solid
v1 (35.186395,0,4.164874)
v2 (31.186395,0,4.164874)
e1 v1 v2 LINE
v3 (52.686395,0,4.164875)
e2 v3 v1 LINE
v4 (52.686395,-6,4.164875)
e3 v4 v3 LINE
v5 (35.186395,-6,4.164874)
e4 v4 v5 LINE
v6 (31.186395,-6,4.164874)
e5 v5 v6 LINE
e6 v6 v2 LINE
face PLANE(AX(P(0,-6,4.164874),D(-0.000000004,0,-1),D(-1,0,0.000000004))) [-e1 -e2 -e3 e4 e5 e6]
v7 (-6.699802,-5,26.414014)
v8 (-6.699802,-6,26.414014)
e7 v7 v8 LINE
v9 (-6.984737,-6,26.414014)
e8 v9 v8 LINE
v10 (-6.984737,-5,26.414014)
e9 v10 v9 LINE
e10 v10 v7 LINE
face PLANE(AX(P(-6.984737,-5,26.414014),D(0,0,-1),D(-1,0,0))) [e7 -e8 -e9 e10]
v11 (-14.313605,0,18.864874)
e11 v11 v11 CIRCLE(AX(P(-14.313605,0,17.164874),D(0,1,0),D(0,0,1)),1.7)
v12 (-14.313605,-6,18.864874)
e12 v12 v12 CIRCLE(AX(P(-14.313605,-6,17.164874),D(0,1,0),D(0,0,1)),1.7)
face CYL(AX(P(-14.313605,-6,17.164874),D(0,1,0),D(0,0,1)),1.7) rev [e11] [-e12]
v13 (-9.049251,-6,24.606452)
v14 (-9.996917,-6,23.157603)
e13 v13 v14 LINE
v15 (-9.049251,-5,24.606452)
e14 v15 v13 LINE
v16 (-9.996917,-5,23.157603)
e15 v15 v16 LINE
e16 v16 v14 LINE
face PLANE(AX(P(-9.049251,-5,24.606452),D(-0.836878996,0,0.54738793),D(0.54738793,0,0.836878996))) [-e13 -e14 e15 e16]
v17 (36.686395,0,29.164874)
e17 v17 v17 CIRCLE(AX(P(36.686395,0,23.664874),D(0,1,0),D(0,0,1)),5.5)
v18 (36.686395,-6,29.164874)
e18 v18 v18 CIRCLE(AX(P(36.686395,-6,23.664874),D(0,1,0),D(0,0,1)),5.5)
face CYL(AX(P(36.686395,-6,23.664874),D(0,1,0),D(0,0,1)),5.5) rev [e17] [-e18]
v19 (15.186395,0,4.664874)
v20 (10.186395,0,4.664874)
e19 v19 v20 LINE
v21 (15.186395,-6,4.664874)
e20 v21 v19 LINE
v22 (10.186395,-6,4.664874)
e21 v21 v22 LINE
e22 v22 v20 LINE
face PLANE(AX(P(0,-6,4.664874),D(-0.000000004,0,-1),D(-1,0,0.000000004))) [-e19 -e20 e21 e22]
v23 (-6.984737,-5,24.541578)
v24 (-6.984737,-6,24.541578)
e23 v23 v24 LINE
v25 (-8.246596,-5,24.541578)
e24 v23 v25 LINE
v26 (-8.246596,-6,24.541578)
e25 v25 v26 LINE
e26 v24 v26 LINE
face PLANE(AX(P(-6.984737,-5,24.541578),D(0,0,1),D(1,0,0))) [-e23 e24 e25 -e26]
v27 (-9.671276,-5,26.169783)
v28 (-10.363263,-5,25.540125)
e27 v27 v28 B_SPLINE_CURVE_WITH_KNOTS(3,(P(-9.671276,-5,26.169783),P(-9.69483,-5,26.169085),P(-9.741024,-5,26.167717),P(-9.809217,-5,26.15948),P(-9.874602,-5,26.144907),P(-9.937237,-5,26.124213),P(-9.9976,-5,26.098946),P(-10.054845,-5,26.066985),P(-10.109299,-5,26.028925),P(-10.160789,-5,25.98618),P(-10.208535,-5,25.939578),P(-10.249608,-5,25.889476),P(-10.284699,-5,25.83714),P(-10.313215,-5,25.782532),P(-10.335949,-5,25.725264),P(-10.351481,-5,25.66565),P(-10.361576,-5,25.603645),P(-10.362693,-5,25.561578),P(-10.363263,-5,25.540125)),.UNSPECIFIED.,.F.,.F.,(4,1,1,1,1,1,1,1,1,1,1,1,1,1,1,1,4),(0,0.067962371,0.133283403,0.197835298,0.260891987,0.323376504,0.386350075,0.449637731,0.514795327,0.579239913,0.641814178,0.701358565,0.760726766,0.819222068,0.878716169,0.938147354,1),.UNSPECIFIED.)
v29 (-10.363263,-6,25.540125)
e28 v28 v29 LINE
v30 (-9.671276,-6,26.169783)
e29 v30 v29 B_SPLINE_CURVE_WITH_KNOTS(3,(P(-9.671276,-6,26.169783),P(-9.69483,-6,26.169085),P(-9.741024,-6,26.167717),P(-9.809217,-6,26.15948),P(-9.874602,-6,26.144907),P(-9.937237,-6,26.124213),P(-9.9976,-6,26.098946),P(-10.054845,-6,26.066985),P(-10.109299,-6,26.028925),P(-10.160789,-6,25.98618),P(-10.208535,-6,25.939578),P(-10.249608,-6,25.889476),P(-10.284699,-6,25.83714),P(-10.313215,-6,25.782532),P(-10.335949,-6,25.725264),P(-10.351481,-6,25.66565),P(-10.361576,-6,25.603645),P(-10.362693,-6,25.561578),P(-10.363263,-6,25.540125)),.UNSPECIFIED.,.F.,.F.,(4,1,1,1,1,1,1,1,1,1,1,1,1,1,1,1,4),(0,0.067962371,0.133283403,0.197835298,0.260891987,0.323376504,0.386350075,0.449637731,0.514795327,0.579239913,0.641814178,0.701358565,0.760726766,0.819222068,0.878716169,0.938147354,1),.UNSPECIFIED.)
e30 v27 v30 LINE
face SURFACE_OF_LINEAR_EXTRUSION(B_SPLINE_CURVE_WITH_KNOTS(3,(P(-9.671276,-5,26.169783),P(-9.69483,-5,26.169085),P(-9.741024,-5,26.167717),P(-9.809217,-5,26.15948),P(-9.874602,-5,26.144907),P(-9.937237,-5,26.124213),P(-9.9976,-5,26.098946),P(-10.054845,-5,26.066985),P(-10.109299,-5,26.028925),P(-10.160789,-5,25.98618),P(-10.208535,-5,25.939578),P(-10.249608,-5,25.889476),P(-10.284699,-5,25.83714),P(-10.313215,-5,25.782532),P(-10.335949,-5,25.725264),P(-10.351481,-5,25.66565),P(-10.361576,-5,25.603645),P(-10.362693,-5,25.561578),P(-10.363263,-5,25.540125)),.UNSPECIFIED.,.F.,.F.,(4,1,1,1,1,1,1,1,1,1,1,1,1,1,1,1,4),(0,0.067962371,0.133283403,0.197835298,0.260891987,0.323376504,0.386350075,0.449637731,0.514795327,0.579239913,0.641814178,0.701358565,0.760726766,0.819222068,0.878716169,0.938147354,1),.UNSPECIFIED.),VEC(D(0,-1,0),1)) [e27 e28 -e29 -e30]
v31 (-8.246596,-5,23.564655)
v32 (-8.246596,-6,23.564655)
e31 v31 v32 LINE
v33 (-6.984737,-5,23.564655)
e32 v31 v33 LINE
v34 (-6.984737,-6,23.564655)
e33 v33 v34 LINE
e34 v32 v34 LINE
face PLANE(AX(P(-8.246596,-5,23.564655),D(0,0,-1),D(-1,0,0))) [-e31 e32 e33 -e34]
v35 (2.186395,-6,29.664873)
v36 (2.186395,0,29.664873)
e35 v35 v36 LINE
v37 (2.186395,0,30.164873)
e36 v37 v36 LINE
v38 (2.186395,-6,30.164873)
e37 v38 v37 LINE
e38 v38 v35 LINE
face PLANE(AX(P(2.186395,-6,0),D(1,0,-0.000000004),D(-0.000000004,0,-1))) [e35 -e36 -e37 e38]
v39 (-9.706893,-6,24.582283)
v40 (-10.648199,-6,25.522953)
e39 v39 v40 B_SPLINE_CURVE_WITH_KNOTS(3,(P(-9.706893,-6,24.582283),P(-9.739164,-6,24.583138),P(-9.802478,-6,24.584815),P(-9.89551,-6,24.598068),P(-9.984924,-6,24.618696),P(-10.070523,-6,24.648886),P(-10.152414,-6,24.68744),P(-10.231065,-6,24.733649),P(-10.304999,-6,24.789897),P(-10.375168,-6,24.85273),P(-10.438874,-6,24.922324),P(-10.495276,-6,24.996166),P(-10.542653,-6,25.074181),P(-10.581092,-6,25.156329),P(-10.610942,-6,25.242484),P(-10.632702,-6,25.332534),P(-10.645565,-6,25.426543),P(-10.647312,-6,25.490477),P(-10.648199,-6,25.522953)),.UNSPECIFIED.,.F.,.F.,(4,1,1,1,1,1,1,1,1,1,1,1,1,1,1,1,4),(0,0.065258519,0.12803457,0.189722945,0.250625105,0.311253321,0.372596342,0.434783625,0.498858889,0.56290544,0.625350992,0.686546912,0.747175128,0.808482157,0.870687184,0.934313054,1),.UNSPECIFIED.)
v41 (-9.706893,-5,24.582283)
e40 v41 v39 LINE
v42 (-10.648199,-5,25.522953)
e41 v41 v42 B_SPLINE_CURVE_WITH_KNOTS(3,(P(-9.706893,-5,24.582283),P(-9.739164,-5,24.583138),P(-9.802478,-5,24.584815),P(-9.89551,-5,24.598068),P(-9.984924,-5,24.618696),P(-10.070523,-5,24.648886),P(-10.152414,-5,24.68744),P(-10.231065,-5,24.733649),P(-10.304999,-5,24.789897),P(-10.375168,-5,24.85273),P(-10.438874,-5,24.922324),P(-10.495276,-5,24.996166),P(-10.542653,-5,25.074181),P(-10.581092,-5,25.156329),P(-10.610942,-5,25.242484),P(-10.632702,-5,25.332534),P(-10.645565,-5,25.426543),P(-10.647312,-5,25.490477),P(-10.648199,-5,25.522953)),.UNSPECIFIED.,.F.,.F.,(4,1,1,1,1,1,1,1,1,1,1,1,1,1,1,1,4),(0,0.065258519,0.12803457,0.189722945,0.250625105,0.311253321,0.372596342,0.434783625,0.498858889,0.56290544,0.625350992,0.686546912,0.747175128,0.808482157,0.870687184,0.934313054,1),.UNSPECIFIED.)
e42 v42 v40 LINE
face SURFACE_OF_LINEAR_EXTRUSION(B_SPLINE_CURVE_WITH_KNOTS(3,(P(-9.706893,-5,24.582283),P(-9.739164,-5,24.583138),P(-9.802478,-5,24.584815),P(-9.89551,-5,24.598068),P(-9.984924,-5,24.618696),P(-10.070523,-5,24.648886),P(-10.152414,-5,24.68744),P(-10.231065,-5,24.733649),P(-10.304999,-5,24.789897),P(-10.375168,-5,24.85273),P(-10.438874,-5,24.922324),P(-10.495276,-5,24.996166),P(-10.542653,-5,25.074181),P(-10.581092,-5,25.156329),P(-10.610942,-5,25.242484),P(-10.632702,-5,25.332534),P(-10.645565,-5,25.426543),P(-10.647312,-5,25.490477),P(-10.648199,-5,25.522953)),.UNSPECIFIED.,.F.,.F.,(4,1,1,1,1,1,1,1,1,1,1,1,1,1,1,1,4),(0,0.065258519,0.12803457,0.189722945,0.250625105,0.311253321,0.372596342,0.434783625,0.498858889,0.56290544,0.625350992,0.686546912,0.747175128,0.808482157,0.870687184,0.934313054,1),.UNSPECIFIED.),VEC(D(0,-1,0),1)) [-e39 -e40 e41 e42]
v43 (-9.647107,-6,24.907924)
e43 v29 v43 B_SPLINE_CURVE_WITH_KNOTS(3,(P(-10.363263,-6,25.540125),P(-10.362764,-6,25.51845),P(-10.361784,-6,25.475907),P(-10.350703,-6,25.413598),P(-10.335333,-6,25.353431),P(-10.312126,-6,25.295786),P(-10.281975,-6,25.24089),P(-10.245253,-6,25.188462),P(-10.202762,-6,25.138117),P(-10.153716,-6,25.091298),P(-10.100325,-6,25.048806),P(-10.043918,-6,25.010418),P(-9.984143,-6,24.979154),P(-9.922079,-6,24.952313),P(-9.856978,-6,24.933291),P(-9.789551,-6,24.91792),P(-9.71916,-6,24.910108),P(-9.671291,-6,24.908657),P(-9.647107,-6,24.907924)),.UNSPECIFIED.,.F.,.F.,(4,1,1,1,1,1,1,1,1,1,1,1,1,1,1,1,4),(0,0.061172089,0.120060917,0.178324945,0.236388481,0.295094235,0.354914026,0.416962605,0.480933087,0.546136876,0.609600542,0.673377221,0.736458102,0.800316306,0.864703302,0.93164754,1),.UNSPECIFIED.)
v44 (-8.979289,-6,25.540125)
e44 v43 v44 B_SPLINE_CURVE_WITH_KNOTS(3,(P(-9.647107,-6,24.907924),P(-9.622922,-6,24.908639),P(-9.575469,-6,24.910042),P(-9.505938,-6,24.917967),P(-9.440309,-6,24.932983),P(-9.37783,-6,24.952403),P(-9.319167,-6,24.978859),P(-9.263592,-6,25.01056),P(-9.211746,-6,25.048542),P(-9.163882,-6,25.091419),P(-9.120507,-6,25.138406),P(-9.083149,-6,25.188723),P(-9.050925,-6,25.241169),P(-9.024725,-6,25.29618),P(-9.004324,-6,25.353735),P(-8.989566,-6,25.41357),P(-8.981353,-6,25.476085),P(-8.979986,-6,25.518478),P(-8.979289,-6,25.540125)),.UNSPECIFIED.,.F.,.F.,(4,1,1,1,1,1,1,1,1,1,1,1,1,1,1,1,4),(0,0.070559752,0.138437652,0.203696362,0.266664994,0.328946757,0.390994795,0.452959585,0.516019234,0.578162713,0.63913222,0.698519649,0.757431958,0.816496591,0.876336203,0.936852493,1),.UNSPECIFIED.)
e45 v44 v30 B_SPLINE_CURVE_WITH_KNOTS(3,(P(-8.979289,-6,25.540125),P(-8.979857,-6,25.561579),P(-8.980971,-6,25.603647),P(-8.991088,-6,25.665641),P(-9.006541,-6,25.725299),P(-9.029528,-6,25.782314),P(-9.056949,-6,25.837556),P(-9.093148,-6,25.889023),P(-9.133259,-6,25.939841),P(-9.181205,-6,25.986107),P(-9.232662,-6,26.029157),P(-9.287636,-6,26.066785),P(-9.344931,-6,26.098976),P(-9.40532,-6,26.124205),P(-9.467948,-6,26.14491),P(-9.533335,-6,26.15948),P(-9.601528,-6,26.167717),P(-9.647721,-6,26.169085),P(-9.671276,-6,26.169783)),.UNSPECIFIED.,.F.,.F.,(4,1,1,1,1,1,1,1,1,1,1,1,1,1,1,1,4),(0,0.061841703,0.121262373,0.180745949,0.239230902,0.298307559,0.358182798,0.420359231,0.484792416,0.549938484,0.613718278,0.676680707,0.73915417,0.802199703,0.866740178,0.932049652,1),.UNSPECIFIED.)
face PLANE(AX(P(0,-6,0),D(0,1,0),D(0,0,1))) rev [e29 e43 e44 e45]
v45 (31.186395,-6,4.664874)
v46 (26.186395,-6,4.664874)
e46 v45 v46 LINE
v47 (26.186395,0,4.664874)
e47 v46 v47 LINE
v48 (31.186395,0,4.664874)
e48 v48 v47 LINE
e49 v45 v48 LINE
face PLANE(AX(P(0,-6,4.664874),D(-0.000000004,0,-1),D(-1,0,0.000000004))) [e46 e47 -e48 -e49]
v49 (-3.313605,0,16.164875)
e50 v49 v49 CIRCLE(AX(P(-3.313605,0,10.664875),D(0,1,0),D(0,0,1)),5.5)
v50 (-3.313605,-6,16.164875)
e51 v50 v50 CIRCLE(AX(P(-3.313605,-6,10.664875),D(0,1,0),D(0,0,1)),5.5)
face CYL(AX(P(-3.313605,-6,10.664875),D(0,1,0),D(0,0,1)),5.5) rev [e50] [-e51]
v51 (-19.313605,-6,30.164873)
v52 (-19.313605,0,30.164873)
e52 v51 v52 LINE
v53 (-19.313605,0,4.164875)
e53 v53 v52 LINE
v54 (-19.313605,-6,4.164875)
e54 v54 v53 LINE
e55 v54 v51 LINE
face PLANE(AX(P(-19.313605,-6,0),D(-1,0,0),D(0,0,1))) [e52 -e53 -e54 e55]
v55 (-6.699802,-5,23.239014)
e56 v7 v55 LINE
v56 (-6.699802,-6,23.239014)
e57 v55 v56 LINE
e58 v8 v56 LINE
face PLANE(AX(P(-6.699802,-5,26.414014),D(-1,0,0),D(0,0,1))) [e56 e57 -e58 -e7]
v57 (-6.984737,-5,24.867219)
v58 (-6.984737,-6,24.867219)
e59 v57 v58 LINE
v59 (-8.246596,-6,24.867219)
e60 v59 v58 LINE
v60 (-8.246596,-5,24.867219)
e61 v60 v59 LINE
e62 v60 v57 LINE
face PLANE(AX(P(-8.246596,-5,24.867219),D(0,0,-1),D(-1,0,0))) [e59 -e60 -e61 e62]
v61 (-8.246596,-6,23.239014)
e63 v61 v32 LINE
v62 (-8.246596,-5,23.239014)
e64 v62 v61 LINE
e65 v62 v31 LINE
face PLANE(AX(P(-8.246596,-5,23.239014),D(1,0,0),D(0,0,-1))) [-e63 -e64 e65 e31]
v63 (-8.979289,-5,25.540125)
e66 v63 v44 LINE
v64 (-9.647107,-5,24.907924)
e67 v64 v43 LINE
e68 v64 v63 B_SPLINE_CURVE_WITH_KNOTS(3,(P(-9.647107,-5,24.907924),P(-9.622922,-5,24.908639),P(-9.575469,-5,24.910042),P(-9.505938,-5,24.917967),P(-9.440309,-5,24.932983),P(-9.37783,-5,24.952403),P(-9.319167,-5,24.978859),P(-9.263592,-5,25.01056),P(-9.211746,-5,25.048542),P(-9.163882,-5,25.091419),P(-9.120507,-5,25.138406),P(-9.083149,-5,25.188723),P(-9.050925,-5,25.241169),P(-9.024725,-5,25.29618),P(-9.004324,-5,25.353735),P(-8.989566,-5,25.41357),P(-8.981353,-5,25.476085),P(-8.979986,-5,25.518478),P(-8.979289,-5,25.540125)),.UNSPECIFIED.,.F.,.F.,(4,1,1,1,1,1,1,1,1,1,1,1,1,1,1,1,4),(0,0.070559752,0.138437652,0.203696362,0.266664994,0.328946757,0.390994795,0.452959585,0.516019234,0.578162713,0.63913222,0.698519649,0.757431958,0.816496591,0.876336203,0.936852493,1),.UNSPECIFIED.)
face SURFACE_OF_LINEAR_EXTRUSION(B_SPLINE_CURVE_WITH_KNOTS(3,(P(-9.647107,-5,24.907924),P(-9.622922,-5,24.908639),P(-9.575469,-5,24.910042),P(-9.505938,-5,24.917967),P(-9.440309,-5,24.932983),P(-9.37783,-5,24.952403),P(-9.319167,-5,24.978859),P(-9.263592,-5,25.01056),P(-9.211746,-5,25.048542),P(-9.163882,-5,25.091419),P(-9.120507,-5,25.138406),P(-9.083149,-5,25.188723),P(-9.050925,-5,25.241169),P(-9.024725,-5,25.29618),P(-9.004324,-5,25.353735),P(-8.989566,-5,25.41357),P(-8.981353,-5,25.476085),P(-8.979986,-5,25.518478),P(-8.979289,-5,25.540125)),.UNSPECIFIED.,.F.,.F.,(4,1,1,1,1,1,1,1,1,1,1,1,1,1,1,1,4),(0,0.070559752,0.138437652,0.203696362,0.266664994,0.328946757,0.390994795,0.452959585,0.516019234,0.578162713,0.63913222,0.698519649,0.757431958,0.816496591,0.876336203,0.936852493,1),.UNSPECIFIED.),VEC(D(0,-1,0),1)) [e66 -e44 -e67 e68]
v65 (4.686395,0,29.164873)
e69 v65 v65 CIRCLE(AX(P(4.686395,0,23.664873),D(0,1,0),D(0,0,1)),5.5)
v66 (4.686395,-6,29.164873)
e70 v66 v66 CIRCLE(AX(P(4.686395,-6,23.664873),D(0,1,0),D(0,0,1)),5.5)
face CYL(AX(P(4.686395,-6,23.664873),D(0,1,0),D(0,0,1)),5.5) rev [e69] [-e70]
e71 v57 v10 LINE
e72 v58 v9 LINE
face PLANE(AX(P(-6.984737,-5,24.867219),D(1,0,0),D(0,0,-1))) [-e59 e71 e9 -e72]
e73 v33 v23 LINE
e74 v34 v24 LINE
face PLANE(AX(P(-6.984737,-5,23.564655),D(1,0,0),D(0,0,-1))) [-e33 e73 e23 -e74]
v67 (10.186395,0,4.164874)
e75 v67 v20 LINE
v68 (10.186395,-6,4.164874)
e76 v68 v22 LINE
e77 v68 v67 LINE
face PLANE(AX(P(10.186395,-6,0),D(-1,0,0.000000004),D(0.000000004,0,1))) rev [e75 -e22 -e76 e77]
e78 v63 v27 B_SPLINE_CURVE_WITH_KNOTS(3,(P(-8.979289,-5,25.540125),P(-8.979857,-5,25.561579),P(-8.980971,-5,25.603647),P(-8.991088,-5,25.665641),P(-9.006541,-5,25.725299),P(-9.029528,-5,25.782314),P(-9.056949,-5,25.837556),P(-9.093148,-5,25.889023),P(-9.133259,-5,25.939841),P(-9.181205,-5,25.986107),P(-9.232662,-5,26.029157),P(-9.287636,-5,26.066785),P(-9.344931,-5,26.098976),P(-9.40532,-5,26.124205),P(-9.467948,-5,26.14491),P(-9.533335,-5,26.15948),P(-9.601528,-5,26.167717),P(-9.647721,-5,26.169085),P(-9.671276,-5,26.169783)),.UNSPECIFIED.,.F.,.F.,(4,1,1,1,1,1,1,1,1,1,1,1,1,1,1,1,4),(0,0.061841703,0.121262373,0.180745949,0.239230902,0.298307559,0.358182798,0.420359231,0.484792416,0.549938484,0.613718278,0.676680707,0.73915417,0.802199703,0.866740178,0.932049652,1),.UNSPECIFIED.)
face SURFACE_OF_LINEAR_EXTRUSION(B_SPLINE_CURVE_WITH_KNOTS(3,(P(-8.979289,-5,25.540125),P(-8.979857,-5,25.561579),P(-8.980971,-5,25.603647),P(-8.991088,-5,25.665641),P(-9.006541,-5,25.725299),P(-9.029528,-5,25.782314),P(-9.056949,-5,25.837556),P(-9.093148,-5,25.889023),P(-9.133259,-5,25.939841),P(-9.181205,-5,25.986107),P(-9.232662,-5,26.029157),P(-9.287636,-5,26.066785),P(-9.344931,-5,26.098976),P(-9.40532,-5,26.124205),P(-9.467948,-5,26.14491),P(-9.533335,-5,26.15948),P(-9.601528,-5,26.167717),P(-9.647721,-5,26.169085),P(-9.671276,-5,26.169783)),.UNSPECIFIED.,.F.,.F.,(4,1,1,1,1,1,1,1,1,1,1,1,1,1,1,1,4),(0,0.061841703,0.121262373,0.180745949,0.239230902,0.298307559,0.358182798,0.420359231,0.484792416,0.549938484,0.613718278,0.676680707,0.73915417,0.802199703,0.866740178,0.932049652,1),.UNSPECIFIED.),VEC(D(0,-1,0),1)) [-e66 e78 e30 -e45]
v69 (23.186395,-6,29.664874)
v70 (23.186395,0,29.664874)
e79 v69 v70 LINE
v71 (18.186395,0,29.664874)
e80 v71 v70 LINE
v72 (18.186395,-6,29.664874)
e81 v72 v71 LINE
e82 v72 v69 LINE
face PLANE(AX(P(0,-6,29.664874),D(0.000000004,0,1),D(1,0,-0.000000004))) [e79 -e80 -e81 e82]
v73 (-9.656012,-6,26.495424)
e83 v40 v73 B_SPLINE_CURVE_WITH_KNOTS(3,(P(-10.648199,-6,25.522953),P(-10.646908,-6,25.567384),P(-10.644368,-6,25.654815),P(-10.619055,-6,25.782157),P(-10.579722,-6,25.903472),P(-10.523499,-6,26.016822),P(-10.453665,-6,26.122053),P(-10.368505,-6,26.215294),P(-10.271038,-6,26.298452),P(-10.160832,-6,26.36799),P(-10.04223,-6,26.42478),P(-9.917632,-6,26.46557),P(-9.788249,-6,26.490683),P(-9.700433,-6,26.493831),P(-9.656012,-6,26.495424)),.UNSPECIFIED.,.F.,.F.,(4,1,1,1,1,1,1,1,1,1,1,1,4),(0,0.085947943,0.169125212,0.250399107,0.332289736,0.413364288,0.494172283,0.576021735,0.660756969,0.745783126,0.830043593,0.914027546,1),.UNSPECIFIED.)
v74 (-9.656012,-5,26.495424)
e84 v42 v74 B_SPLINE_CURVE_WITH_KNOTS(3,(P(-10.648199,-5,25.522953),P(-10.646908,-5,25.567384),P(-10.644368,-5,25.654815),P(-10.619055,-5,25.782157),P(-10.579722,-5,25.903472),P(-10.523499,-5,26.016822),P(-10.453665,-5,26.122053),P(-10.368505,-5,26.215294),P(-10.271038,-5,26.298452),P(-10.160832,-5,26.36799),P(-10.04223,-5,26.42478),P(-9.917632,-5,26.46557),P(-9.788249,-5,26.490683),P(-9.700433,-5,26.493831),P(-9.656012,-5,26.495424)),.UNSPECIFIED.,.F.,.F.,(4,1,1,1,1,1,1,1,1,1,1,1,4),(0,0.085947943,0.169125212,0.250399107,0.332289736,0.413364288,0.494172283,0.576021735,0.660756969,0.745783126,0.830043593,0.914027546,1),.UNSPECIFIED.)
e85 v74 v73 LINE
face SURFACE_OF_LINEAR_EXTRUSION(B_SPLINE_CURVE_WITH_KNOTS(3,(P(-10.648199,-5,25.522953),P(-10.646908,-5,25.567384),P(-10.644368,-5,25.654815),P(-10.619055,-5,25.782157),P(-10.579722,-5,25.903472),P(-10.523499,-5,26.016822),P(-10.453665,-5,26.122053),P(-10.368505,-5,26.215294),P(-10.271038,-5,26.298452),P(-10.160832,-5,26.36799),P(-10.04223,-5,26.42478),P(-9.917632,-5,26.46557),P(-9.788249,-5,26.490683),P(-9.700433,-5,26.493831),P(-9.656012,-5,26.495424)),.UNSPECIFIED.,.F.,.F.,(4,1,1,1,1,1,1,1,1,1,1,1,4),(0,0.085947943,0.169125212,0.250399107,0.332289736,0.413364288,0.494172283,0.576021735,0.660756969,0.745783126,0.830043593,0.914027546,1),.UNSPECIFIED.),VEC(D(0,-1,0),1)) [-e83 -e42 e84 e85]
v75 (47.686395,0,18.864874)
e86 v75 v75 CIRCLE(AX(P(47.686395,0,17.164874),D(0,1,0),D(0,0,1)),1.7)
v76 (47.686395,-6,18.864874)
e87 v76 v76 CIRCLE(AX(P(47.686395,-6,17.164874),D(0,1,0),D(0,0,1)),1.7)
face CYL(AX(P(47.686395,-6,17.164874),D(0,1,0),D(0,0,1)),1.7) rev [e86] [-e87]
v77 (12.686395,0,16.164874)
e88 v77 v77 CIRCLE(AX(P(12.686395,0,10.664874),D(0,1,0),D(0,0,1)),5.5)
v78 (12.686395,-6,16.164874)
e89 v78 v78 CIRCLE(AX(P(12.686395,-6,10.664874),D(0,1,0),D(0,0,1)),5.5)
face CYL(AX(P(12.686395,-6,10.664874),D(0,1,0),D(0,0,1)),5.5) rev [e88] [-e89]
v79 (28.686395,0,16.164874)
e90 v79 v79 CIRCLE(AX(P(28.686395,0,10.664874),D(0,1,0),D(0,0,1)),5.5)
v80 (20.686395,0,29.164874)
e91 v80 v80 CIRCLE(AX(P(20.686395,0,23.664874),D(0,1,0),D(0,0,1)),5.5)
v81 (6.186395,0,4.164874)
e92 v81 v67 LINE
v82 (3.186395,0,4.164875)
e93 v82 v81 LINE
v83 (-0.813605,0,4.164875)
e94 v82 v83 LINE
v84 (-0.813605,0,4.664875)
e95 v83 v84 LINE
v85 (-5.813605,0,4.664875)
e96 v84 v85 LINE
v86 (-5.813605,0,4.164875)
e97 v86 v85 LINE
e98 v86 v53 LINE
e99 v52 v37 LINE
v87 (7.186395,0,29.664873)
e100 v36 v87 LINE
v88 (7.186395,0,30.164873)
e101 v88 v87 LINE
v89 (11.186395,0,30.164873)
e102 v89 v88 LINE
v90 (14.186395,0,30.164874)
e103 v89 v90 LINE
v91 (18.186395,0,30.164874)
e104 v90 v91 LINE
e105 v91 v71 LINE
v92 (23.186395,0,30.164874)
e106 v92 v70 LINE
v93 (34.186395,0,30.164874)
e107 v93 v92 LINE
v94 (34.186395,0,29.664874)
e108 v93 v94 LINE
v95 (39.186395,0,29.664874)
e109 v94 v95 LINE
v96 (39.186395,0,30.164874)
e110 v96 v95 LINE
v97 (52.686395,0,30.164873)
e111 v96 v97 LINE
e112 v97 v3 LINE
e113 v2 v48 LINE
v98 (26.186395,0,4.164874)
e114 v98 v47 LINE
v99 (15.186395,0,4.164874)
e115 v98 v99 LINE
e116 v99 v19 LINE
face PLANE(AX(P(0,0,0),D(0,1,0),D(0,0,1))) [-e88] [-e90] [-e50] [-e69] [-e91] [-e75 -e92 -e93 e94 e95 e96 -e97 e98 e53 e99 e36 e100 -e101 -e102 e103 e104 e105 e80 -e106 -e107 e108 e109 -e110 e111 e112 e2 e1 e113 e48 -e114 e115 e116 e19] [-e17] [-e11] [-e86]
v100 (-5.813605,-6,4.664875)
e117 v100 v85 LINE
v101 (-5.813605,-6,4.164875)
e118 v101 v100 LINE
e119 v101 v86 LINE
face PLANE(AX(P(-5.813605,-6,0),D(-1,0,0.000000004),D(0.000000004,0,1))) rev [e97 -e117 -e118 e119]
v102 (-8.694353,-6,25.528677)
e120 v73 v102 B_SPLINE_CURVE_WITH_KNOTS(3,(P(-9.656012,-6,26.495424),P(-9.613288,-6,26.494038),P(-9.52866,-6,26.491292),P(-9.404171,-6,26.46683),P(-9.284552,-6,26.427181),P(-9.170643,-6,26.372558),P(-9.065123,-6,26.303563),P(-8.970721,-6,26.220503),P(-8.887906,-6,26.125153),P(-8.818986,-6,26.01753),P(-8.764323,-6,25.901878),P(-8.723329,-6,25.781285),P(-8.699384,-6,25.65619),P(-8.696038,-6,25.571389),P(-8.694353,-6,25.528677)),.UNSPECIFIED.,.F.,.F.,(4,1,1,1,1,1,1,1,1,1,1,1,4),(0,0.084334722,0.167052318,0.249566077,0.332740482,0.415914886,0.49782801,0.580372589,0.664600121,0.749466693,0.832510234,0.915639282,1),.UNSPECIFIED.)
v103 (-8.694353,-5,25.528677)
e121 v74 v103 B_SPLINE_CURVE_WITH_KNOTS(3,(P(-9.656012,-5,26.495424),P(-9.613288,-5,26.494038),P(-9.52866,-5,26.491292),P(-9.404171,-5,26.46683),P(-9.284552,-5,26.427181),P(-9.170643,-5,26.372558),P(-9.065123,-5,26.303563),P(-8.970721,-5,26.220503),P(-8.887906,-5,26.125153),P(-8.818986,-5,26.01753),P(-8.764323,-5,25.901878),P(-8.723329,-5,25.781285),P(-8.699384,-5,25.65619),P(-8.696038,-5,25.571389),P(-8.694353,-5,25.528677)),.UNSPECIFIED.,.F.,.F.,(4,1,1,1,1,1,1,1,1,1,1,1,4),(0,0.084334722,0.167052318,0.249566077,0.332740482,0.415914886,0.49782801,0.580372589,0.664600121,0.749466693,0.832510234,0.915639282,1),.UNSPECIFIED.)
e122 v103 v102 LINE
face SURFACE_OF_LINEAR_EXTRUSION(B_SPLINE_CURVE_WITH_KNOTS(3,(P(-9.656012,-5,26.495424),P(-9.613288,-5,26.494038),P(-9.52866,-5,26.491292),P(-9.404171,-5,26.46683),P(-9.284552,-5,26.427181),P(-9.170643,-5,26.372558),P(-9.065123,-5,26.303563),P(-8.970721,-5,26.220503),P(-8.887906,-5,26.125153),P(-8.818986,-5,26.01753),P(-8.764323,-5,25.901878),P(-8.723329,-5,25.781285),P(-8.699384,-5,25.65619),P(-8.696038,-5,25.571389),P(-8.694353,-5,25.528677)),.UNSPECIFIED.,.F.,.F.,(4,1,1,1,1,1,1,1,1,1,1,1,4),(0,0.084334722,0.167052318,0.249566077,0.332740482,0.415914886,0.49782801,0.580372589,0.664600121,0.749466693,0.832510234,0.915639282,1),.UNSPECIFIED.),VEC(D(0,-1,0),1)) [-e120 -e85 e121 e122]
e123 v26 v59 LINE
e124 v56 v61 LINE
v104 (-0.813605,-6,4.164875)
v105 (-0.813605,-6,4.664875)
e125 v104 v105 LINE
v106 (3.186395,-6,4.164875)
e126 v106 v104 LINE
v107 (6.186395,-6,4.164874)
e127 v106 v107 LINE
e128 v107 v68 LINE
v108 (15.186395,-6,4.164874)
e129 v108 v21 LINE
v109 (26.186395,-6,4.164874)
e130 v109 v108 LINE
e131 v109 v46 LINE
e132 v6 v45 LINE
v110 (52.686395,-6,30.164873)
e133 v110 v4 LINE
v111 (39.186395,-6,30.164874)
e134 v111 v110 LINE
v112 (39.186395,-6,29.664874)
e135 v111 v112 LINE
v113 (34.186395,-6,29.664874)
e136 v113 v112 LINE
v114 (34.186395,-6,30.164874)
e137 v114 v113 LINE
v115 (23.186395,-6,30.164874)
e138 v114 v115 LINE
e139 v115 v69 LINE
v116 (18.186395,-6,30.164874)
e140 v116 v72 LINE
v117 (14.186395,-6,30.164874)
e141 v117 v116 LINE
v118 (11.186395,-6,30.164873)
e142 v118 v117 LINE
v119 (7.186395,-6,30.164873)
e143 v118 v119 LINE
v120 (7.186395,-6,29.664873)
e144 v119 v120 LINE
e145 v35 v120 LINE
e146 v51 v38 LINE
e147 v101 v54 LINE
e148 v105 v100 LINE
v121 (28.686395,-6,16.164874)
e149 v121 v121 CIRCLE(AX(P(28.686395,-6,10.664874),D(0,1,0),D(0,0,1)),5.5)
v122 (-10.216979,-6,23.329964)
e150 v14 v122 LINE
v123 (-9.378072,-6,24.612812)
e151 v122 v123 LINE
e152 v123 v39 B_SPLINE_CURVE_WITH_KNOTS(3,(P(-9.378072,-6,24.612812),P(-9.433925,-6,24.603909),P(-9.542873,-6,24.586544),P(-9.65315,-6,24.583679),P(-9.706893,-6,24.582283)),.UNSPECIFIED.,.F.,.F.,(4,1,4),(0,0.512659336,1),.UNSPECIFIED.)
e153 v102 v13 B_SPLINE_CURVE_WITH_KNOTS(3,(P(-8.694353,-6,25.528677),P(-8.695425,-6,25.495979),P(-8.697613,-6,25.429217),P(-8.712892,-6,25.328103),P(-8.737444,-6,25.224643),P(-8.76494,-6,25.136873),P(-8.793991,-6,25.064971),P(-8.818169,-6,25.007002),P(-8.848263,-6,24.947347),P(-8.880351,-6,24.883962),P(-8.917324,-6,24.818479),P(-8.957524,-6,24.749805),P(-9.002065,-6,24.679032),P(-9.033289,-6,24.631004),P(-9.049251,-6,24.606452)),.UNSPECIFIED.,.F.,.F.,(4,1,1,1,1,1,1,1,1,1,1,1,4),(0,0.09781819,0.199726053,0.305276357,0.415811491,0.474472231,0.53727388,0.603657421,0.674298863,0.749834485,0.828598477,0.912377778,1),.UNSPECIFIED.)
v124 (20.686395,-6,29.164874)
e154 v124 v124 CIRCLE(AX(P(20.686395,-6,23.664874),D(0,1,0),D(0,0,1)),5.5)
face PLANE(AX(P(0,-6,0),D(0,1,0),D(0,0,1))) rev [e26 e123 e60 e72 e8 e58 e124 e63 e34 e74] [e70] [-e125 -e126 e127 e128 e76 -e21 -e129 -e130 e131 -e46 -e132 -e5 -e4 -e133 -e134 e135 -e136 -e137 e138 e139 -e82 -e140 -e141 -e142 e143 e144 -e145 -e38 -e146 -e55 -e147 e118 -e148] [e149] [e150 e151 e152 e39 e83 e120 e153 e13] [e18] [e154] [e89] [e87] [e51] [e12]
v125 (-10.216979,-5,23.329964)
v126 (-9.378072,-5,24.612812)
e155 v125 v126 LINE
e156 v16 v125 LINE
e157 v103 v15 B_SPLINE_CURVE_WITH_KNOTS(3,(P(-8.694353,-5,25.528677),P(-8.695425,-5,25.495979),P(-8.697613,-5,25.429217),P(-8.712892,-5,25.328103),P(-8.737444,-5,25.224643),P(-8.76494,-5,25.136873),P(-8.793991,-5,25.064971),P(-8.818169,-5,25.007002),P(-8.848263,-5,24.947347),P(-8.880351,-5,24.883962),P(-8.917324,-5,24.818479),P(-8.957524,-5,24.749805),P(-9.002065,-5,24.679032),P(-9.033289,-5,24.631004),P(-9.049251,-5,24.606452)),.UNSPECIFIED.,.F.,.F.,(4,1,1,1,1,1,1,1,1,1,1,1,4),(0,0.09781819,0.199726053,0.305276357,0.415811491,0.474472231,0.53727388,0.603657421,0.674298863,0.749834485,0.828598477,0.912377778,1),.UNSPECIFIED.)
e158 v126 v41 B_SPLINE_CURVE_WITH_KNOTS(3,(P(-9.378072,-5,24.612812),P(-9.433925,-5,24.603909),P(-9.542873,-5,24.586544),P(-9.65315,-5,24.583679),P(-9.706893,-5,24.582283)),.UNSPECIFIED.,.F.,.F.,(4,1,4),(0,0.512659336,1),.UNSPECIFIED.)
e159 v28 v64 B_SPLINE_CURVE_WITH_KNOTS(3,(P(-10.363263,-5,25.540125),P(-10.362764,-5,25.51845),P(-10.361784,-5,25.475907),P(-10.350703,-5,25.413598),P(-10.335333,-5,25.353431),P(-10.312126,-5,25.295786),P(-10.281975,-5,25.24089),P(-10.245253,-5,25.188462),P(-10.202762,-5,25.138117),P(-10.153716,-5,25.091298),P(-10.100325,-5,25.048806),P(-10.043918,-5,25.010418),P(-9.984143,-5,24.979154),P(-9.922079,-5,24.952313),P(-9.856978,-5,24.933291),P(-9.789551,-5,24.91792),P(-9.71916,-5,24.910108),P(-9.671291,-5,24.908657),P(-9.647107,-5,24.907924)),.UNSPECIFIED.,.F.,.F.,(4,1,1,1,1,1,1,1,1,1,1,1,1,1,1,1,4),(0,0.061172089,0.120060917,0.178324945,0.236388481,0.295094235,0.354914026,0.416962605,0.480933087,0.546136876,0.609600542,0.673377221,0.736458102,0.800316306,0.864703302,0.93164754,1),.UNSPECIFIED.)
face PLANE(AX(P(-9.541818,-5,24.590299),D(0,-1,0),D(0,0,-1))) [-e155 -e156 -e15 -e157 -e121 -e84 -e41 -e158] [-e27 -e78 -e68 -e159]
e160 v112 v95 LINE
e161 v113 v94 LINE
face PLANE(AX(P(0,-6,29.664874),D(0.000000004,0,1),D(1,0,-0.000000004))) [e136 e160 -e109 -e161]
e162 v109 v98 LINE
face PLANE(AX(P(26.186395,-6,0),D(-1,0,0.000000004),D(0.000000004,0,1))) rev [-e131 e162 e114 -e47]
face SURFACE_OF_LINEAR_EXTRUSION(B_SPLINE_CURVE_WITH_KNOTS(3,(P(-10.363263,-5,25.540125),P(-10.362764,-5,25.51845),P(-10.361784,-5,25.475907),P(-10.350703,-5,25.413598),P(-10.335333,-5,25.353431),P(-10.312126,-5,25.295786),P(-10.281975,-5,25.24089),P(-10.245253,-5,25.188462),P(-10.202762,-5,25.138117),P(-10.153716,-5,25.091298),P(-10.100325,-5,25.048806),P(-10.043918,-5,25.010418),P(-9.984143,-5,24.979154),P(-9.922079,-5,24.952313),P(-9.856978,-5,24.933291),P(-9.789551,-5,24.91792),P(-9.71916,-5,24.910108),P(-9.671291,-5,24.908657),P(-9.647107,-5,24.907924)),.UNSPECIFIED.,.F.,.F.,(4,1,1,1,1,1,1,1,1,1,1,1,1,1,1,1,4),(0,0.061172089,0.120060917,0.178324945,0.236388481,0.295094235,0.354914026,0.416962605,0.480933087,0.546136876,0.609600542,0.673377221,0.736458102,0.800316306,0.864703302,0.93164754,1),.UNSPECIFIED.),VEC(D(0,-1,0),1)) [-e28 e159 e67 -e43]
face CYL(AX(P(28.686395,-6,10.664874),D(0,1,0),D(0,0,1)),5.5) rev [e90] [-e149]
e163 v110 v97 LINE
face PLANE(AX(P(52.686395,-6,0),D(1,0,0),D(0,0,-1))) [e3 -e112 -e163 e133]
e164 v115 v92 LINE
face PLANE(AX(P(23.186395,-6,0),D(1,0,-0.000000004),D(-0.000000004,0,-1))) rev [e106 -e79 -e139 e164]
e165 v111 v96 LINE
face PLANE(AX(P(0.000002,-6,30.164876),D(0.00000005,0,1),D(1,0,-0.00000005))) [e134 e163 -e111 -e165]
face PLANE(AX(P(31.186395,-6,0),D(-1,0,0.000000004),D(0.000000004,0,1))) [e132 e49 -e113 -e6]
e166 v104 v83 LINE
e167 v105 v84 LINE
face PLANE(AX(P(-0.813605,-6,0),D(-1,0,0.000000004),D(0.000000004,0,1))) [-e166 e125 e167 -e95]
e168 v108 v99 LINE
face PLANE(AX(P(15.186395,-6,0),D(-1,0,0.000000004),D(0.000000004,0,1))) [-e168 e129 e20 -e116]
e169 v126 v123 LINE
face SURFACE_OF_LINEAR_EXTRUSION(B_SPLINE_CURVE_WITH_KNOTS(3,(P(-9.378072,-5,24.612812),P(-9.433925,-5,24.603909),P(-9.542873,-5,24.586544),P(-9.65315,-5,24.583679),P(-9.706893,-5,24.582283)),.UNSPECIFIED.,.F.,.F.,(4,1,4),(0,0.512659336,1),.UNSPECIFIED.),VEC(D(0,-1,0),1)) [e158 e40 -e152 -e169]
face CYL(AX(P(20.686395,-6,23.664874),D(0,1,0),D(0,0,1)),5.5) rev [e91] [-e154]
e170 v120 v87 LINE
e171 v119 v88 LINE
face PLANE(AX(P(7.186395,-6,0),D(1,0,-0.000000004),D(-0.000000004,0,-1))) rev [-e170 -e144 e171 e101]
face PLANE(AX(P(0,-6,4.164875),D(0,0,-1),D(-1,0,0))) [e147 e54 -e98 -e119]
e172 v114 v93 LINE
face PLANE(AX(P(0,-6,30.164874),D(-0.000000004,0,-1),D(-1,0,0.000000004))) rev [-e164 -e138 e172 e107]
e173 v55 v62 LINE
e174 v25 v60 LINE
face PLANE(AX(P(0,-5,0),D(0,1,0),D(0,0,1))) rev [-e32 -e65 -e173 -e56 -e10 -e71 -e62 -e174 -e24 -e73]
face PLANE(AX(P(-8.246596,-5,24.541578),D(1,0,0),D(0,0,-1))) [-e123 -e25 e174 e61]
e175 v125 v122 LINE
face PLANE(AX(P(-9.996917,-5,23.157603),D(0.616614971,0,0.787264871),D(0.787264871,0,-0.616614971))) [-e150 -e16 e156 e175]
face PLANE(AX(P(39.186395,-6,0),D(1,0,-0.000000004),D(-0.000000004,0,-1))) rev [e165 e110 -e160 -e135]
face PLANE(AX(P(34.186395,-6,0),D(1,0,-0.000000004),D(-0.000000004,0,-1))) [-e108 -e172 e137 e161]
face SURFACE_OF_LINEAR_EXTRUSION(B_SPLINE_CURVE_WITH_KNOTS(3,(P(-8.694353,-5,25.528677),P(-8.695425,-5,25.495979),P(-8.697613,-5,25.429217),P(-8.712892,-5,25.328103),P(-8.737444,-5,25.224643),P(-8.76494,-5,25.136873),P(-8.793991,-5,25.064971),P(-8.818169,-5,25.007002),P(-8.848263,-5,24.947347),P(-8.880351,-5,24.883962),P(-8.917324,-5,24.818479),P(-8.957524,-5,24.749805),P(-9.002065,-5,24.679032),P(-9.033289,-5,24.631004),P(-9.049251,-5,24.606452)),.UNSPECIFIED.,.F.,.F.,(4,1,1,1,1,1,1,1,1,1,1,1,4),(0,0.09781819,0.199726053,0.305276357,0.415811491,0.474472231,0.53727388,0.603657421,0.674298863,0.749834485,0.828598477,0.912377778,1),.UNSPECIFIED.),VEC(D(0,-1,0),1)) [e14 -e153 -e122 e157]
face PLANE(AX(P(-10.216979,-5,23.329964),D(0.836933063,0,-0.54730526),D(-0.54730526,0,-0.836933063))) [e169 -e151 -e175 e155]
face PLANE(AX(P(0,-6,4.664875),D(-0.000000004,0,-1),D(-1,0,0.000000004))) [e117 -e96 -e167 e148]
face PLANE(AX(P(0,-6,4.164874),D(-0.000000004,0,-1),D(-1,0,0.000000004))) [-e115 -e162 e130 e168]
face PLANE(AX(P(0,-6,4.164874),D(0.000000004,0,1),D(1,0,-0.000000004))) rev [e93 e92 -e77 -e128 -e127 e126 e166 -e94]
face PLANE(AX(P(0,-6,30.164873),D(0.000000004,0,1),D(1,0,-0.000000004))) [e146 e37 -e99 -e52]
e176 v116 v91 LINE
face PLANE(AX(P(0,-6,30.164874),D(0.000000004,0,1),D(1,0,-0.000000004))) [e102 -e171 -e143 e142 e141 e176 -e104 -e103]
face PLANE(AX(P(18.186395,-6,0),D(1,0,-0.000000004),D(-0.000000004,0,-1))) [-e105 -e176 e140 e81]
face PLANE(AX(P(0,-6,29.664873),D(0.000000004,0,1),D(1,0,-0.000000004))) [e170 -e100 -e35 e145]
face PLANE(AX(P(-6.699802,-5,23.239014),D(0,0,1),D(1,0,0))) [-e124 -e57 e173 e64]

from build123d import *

# Parameters (mm, degrees)
SKETCH1_R             = 5.5
BOSS_EXTRUDE1_DEPTH   = 6
BOSS_EXTRUDE1_2_DEPTH = 6
BOSS_EXTRUDE1_3_DEPTH = 6
BOSS_EXTRUDE1_4_DEPTH = 6
BOSS_EXTRUDE1_5_DEPTH = 6
BOSS_EXTRUDE1_6_DEPTH = 6
SKETCH1_3_R           = 1.7
BOSS_EXTRUDE2_DEPTH   = 6
CUT_EXTRUDE1_DEPTH    = 1


with BuildPart() as part:
    # Sketch1 → Boss-Extrude1 (new body)
    with BuildSketch(Plane(origin=(0, 0, 0), x_dir=(1, 0, 0), z_dir=(0, 1, 0))):
        Polygon((2.68639507, -4.66487452), (-9.31360493, -4.664874562), (-9.313604887, -16.664874562), (2.686395113, -16.66487452), align=None)
        with Locations((-3.313604908, -10.664874541)):
            Circle(SKETCH1_R, mode=Mode.SUBTRACT)
    extrude(amount=-BOSS_EXTRUDE1_DEPTH)



with BuildPart() as body_2:
    # Sketch1 → Boss-Extrude1 2 (new body)
    with BuildSketch(Plane(origin=(0, 0, 0), x_dir=(1, 0, 0), z_dir=(0, 1, 0))):
        Polygon((18.68639507, -4.664873819), (6.68639507, -4.664873862), (6.686395113, -16.664873862), (18.686395113, -16.664873819), align=None)
        with Locations((12.686395092, -10.66487384)):
            Circle(SKETCH1_R, mode=Mode.SUBTRACT)
    extrude(amount=-BOSS_EXTRUDE1_2_DEPTH)


with BuildPart() as body_3:
    # Sketch1 → Boss-Extrude1 3 (new body)
    with BuildSketch(Plane(origin=(0, 0, 0), x_dir=(1, 0, 0), z_dir=(0, 1, 0))):
        Polygon((-1.313604837, -29.664873456), (10.686395163, -29.664873413), (10.68639512, -17.664873413), (-1.31360488, -17.664873456), align=None)
        with Locations((4.686395141, -23.664873434)):
            Circle(SKETCH1_R, mode=Mode.SUBTRACT)
    extrude(amount=-BOSS_EXTRUDE1_3_DEPTH)


with BuildPart() as body_4:
    # Sketch1 → Boss-Extrude1 4 (new body)
    with BuildSketch(Plane(origin=(0, 0, 0), x_dir=(1, 0, 0), z_dir=(0, 1, 0))):
        Polygon((14.686395163, -29.664873833), (26.686395163, -29.664873791), (26.68639512, -17.664873791), (14.68639512, -17.664873833), align=None)
        with Locations((20.686395141, -23.664873812)):
            Circle(SKETCH1_R, mode=Mode.SUBTRACT)
    extrude(amount=-BOSS_EXTRUDE1_4_DEPTH)


with BuildPart() as body_5:
    # Sketch1 → Boss-Extrude1 5 (new body)
    with BuildSketch(Plane(origin=(0, 0, 0), x_dir=(1, 0, 0), z_dir=(0, 1, 0))):
        Polygon((34.68639507, -4.664873762), (22.68639507, -4.664873805), (22.686395113, -16.664873805), (34.686395113, -16.664873762), align=None)
        with Locations((28.686395092, -10.664873784)):
            Circle(SKETCH1_R, mode=Mode.SUBTRACT)
    extrude(amount=-BOSS_EXTRUDE1_5_DEPTH)


with BuildPart() as body_6:
    # Sketch1 → Boss-Extrude1 6 (new body)
    with BuildSketch(Plane(origin=(0, 0, 0), x_dir=(1, 0, 0), z_dir=(0, 1, 0))):
        Polygon((30.686395163, -29.664873979), (42.686395163, -29.664873936), (42.68639512, -17.664873936), (30.68639512, -17.664873979), align=None)
        with Locations((36.686395141, -23.664873958)):
            Circle(SKETCH1_R, mode=Mode.SUBTRACT)
    extrude(amount=-BOSS_EXTRUDE1_6_DEPTH)


with BuildPart() as part_1:
    add(part.part)

    add(body_2.part)  # Boss-Extrude2 merges body 2

    add(body_3.part)  # Boss-Extrude2 merges body 3

    add(body_4.part)  # Boss-Extrude2 merges body 4

    add(body_5.part)  # Boss-Extrude2 merges body 5

    add(body_6.part)  # Boss-Extrude2 merges body 6
    # Sketch1<3> → Boss-Extrude2 (add)
    with BuildSketch(Plane(origin=(0, 0, 0), x_dir=(1, 0, 0), z_dir=(0, 1, 0))):
        Polygon((6.186395002, -4.164873846), (3.186395002, -4.1648745), (-0.813604931, -4.164874532), (-0.81360493, -4.664874532), (2.68639507, -4.66487452), (2.686395113, -16.66487452), (-9.313604887, -16.664874562), (-9.31360493, -4.664874562), (-5.81360493, -4.66487455), (-5.813604931, -4.16487455), (-9.813604931, -4.164874564), (-19.313604998, -4.164874546), (-19.313604998, -30.16487344), (-1.813604902, -30.16487344), (2.186395164, -30.164873443), (2.186395163, -29.664873443), (-1.313604837, -29.664873456), (-1.31360488, -17.664873456), (10.68639512, -17.664873413), (10.686395163, -29.664873413), (7.186395163, -29.664873425), (7.186395164, -30.164873425), (11.186395164, -30.164873411), (14.186395098, -30.164873817), (18.186395164, -30.164873821), (18.186395163, -29.664873821), (14.686395163, -29.664873833), (14.68639512, -17.664873833), (26.68639512, -17.664873791), (26.686395163, -29.664873791), (23.186395163, -29.664873803), (23.186395164, -30.164873803), (27.186395164, -30.164873789), (30.186395098, -30.164873963), (34.186395164, -30.164873966), (34.186395163, -29.664873966), (30.686395163, -29.664873979), (30.68639512, -17.664873979), (42.68639512, -17.664873936), (42.686395163, -29.664873936), (39.186395163, -29.664873949), (39.186395164, -30.164873949), (43.186395164, -30.164873935), (52.686395098, -30.16487344), (52.686395098, -4.164874546), (35.186395002, -4.164873743), (31.186395069, -4.164873775), (31.18639507, -4.664873775), (34.68639507, -4.664873762), (34.686395113, -16.664873762), (22.686395113, -16.664873805), (22.68639507, -4.664873805), (26.18639507, -4.664873793), (26.186395069, -4.164873793), (22.186395069, -4.164873807), (19.186395002, -4.1648738), (15.186395069, -4.164873832), (15.18639507, -4.664873832), (18.68639507, -4.664873819), (18.686395113, -16.664873819), (6.686395113, -16.664873862), (6.68639507, -4.664873862), (10.18639507, -4.664873849), (10.186395069, -4.164873849), align=None)
        with Locations((-14.313604998, -17.164873993)):
            Circle(SKETCH1_3_R, mode=Mode.SUBTRACT)
        with Locations((47.686395098, -17.164873993)):
            Circle(SKETCH1_3_R, mode=Mode.SUBTRACT)
    extrude(amount=-BOSS_EXTRUDE2_DEPTH)

    # Sketch2 → Cut-Extrude1 (cut)
    # profile 1 of 2: a face of its own
    with BuildSketch(Plane(origin=(0, -6, 0), x_dir=(-1, 0, 0), z_dir=(0, -1, 0))):
        Polygon((6.699801581, -23.2390136), (8.246596453, -23.2390136), (8.246596453, -23.564654626), (6.984737478, -23.564654626), (6.984737478, -24.541577703), (8.246596453, -24.541577703), (8.246596453, -24.867218728), (6.984737478, -24.867218728), (6.984737478, -26.4140136), (6.699801581, -26.4140136), align=None)
    # profile 2 of 2: a face of its own
    with BuildSketch(Plane(origin=(0, -6, 0), x_dir=(-1, 0, 0), z_dir=(0, -1, 0))):
        with BuildLine():
            Line((9.996916965, -23.157603344), (10.216979065, -23.329964121))
            Line((10.216979065, -23.329964121), (9.378071813, -24.612811677))
            add(Edge.make_bspline(
                [(9.378071813, -24.612811677), (9.43392485, -24.603909103), (9.542872514, -24.586543627), (9.65315015, -24.583678919), (9.706892927, -24.582282831)],
                knots=[0, 0, 0, 0, 1.025318673, 2, 2, 2, 2], degree=3))
            add(Edge.make_bspline(
                [(9.706892927, -24.582282831), (9.739163887, -24.583137599), (9.802478203, -24.584814619), (9.895509725, -24.598067595), (9.984924431, -24.618695779), (10.070522851, -24.64888638), (10.152413619, -24.68743998), (10.231065003, -24.733649384), (10.30499899, -24.789897237), (10.375167554, -24.852730491), (10.438873565, -24.922323744), (10.49527613, -24.996166388), (10.542653291, -25.074181472), (10.581092491, -25.156329486), (10.610941917, -25.2424838), (10.632702138, -25.332534184), (10.645565054, -25.426542733), (10.647311749, -25.490476506), (10.648199017, -25.522952903)],
                knots=[0, 0, 0, 0, 1.044136307, 2.048553127, 3.035567123, 4.010001674, 4.980053131, 5.96154148, 6.956538004, 7.981742224, 9.006487041, 10.005615874, 10.984750588, 11.954802044, 12.935714515, 13.930994945, 14.949008866, 16, 16, 16, 16], degree=3))
            add(Edge.make_bspline(
                [(10.648199017, -25.522952903), (10.646908057, -25.567384491), (10.644367755, -25.654815343), (10.619055025, -25.782157069), (10.579721633, -25.903471565), (10.523499161, -26.016821942), (10.453665142, -26.122052845), (10.368504755, -26.215293946), (10.271038162, -26.298451765), (10.160832281, -26.36799027), (10.042229735, -26.42478018), (9.917631851, -26.465570078), (9.788248654, -26.49068294), (9.700433045, -26.493831272), (9.656011517, -26.495423856)],
                knots=[0, 0, 0, 0, 1.031375318, 2.029502543, 3.004789286, 3.987476834, 4.960371455, 5.9300674, 6.912260825, 7.929083631, 8.949397511, 9.960523116, 10.96833055, 12, 12, 12, 12], degree=3))
            add(Edge.make_bspline(
                [(9.656011517, -26.495423856), (9.613288081, -26.494037555), (9.528660436, -26.491291536), (9.404170686, -26.466829578), (9.284552092, -26.427180992), (9.170642725, -26.372558039), (9.065123312, -26.303562674), (8.970720913, -26.220502607), (8.887906232, -26.125153306), (8.818986397, -26.017529563), (8.764323119, -25.901877958), (8.723329401, -25.781284966), (8.699384238, -25.656189983), (8.69603819, -25.571389235), (8.694352863, -25.528677062)],
                knots=[0, 0, 0, 0, 1.012016664, 2.004627821, 2.994792927, 3.992885782, 4.990978636, 5.973936114, 6.964471063, 7.975201453, 8.993600317, 9.990122807, 10.98767138, 12, 12, 12, 12], degree=3))
            add(Edge.make_bspline(
                [(8.694352863, -25.528677062), (8.695424602, -25.495979475), (8.697612889, -25.429217252), (8.712892251, -25.328103455), (8.737443886, -25.224642831), (8.764939609, -25.136872955), (8.793991413, -25.064971432), (8.818169074, -25.007001837), (8.848262627, -24.947347149), (8.880351337, -24.883961779), (8.91732364, -24.818479279), (8.957524265, -24.749805236), (9.002064662, -24.679031831), (9.033288667, -24.631003882), (9.049250699, -24.606451501)],
                knots=[0, 0, 0, 0, 1.173818275, 2.396712641, 3.66331629, 4.989737886, 5.693666774, 6.447286557, 7.243889047, 8.091586357, 8.998013824, 9.943181721, 10.948533338, 12, 12, 12, 12], degree=3))
            Line((9.049250699, -24.606451501), (9.996916965, -23.157603344))
        make_face()
        with BuildLine():
            add(Edge.make_bspline(
                [(9.64710727, -24.907923856), (9.622921579, -24.908639019), (9.575469451, -24.910042162), (9.505937895, -24.917966716), (9.440309411, -24.932982832), (9.377830069, -24.952402516), (9.31916676, -24.978858553), (9.263592246, -25.010560401), (9.211746157, -25.048541998), (9.16388158, -25.091418934), (9.120507249, -25.138406483), (9.083148796, -25.188723076), (9.050925237, -25.241169384), (9.024725214, -25.296180139), (9.004323526, -25.353735218), (8.989565892, -25.413569669), (8.981352848, -25.476084793), (8.97998648, -25.518477849), (8.97928876, -25.540125379)],
                knots=[0, 0, 0, 0, 1.128956033, 2.215002439, 3.259141796, 4.2666399, 5.263148119, 6.255916712, 7.247353359, 8.256307737, 9.250603402, 10.226115518, 11.176314381, 12.118911324, 13.063945463, 14.021379252, 14.989639887, 16, 16, 16, 16], degree=3))
            add(Edge.make_bspline(
                [(8.97928876, -25.540125379), (8.97985696, -25.561579289), (8.980971114, -25.603647213), (8.991087861, -25.665640612), (9.006541115, -25.725298779), (9.029528474, -25.782314158), (9.056948579, -25.837555818), (9.093148409, -25.889022827), (9.133259351, -25.939841033), (9.181205419, -25.986106654), (9.232661612, -26.029156591), (9.28763556, -26.066785107), (9.344930667, -26.098976136), (9.405320457, -26.124204774), (9.467948134, -26.144909663), (9.533335493, -26.159479719), (9.601528012, -26.167717054), (9.647721485, -26.169085201), (9.67127594, -26.169782831)],
                knots=[0, 0, 0, 0, 0.989467248, 1.94019797, 2.891935182, 3.827694429, 4.772920941, 5.730924762, 6.725747692, 7.756678648, 8.79901574, 9.819492441, 10.826891316, 11.826466727, 12.835195252, 13.867842842, 14.912794438, 16, 16, 16, 16], degree=3))
            add(Edge.make_bspline(
                [(9.67127594, -26.169782831), (9.694830356, -26.169085146), (9.741023753, -26.167716892), (9.809216821, -26.159480335), (9.874602152, -26.144907404), (9.9372372, -26.124212963), (9.997599783, -26.09894576), (10.054844781, -26.066985375), (10.109298837, -26.028925183), (10.16078881, -25.986180223), (10.208535311, -25.939577707), (10.249608271, -25.889476459), (10.28469949, -25.837139854), (10.313214788, -25.782531768), (10.335948959, -25.725264304), (10.351480576, -25.665649848), (10.361576431, -25.603644795), (10.362693456, -25.561578473), (10.363263119, -25.540125379)],
                knots=[0, 0, 0, 0, 1.087397944, 2.132534446, 3.165364764, 4.174271784, 5.174024072, 6.181601208, 7.194203697, 8.236725232, 9.267838612, 10.269026844, 11.221737037, 12.171628256, 13.107553087, 14.05945871, 15.010357665, 16, 16, 16, 16], degree=3))
            add(Edge.make_bspline(
                [(10.363263119, -25.540125379), (10.362763924, -25.518449609), (10.361784167, -25.475907121), (10.350702565, -25.413597625), (10.335333378, -25.35343124), (10.31212604, -25.29578579), (10.28197527, -25.240889945), (10.245252874, -25.18846183), (10.202761835, -25.138117296), (10.153715725, -25.091298499), (10.100325283, -25.048806355), (10.043918117, -25.010417813), (9.98414317, -24.979153645), (9.922078942, -24.95231253), (9.856977887, -24.933290658), (9.789551091, -24.917919833), (9.719159645, -24.910108409), (9.671290808, -24.908657076), (9.64710727, -24.907923856)],
                knots=[0, 0, 0, 0, 0.978753431, 1.920974676, 2.853199117, 3.782215702, 4.721507756, 5.67862441, 6.671401678, 7.694929396, 8.738190014, 9.75360867, 10.774035531, 11.783329636, 12.805060902, 13.835252836, 14.906360638, 16, 16, 16, 16], degree=3))
        make_face(mode=Mode.SUBTRACT)
    extrude(amount=-CUT_EXTRUDE1_DEPTH, mode=Mode.SUBTRACT)


solid = part_1.part
